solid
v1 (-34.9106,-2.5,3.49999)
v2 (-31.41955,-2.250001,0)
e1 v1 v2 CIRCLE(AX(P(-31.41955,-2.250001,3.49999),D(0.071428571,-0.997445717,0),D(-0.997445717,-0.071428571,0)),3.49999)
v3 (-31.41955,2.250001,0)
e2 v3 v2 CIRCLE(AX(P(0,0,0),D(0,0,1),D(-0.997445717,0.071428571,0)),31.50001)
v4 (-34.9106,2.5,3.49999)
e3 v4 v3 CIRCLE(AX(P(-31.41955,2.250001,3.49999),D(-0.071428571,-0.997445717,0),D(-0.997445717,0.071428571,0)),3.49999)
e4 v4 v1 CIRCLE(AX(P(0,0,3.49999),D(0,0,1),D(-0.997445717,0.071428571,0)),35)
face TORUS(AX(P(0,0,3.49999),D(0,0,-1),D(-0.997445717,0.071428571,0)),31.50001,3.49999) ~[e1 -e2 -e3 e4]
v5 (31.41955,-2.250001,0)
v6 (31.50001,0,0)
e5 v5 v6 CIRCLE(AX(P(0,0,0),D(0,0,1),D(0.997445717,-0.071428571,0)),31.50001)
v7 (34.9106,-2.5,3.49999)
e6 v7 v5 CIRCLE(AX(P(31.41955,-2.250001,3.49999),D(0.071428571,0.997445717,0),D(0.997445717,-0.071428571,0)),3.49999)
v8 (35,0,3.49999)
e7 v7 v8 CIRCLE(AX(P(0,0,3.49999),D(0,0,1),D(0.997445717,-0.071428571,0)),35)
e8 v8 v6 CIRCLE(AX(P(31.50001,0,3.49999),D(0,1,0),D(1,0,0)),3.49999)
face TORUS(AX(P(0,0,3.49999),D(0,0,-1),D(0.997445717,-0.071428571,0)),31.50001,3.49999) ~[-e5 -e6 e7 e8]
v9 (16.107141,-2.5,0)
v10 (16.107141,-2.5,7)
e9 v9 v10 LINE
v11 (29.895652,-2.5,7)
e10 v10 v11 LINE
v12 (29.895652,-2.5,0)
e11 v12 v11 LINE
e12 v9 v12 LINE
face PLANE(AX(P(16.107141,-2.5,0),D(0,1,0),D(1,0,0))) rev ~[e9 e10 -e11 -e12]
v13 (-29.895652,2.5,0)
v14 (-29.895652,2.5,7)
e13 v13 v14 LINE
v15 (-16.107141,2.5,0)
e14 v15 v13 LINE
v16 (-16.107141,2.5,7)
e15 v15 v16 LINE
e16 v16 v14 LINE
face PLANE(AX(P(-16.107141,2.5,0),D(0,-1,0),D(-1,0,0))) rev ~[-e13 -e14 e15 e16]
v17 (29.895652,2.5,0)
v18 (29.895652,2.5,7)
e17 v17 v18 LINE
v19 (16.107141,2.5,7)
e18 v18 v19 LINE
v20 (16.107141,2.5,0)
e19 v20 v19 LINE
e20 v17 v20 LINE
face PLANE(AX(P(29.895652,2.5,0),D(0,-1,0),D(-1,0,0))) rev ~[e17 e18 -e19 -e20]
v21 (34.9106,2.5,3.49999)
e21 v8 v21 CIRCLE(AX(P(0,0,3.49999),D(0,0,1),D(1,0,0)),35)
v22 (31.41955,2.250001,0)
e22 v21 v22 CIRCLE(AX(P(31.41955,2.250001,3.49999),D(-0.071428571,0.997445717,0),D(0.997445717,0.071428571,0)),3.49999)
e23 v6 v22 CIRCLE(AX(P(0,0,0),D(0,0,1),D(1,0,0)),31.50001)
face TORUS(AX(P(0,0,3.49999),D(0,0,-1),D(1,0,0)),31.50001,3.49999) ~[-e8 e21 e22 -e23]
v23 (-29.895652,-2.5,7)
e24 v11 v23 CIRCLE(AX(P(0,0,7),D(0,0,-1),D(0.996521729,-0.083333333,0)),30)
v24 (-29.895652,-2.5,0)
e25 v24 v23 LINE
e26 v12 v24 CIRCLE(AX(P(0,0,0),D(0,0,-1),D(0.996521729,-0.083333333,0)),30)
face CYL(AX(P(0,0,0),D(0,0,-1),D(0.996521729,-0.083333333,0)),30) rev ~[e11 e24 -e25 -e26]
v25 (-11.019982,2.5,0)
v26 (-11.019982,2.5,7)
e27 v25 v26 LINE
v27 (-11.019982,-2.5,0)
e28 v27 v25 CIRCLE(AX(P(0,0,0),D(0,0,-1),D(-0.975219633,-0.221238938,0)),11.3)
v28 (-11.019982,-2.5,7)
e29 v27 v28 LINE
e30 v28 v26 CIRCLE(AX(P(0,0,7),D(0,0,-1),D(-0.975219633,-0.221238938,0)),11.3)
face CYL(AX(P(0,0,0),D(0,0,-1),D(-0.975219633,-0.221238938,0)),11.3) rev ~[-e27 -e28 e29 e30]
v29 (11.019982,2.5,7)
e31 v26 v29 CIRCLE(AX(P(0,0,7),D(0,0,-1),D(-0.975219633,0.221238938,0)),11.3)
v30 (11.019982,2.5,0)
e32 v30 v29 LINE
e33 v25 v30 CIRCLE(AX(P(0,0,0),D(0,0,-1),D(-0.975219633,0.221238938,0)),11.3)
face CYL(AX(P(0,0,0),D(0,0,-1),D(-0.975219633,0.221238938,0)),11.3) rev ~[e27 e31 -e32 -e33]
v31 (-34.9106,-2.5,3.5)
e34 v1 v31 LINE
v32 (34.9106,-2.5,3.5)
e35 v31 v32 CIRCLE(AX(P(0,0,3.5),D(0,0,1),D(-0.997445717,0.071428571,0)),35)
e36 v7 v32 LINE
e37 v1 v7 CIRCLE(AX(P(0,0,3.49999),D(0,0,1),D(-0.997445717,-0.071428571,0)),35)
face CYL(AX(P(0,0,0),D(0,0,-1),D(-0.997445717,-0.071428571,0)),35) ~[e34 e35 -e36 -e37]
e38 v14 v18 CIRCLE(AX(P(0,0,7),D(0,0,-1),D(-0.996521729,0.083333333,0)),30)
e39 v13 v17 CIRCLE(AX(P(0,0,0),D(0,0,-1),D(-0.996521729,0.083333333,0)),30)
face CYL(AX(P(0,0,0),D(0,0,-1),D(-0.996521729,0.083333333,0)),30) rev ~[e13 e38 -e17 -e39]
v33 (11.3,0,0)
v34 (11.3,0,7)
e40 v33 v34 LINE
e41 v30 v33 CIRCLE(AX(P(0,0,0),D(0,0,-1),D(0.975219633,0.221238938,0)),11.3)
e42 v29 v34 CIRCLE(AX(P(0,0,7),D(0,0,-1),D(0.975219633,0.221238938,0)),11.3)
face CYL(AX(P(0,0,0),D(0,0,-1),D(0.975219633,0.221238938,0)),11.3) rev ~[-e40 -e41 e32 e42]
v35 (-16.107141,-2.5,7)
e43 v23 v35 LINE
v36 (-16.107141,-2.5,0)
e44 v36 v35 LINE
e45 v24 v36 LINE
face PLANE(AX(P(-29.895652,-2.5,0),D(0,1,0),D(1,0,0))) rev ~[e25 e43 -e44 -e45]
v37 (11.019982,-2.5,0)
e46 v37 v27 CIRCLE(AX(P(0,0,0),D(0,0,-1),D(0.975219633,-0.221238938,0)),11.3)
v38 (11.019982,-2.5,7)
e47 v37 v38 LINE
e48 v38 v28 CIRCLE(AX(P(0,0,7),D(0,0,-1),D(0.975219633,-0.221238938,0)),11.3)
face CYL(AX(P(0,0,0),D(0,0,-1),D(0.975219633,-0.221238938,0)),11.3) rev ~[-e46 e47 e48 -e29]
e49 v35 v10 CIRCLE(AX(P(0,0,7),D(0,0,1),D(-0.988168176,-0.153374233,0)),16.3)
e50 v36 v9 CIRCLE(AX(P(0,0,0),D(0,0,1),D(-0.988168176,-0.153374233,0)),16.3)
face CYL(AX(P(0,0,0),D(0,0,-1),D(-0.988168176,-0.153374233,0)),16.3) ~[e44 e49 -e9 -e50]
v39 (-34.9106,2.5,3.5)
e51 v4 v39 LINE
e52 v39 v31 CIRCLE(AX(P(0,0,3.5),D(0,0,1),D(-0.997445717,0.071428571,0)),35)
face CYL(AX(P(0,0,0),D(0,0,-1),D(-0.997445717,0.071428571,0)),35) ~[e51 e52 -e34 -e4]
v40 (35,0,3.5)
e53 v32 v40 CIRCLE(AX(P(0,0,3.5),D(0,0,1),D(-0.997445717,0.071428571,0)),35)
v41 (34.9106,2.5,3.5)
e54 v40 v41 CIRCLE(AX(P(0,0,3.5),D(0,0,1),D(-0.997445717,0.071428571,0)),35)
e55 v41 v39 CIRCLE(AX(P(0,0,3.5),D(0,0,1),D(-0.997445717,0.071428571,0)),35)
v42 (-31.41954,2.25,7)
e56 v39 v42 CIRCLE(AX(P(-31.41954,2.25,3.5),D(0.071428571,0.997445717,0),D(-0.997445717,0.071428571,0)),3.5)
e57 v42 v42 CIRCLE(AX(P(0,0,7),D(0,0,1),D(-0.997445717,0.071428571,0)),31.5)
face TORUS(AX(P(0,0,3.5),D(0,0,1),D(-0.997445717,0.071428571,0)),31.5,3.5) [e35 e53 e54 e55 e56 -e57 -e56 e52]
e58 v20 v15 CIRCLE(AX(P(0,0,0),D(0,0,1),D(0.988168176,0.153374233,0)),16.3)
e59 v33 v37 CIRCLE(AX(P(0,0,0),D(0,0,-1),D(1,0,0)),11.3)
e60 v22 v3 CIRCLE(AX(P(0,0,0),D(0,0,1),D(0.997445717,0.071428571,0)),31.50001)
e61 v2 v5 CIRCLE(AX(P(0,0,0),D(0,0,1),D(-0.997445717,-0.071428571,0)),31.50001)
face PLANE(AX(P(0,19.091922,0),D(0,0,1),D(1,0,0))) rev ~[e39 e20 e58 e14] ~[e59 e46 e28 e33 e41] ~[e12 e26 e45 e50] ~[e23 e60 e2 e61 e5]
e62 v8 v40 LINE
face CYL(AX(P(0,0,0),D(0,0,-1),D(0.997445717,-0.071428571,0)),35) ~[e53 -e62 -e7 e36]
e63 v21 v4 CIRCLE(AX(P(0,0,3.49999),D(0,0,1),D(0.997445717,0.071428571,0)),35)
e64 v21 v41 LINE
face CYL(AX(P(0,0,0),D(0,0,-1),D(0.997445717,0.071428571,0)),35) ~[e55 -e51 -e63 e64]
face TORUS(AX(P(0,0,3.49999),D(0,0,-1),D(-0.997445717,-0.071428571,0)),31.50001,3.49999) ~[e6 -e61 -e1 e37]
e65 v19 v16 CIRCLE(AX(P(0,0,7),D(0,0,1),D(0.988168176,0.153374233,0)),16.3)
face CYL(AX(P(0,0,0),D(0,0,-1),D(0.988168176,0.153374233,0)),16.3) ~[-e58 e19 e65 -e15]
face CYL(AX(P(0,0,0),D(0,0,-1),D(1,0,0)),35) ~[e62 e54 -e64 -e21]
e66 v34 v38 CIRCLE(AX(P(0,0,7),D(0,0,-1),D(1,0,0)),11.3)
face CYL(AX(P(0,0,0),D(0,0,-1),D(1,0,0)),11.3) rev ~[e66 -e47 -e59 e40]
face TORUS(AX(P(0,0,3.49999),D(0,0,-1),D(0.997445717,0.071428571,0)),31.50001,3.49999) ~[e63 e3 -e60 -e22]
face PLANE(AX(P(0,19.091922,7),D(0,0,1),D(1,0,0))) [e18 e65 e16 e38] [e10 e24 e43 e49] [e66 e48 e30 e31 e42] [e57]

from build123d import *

# Parameters (mm, degrees)
F1_DEPTH = 7
F3_R     = 3.49999


# Not quite as in the source:
# - a fillet or chamfer that OpenCascade refuses, or shapes differently, is made with other operations: its cross-section is extruded or revolved along the edge and cut away or added
# - a fillet or chamfer is up to 0.001 mm smaller than in the source, because OpenCascade refuses the exact size


with BuildPart() as f1:
    # F0 (on Top) → F1 (new body)
    with BuildSketch(Plane.XY):
        with BuildLine():
            ThreePointArc((-29.8956518578, 2.5), (0, 30), (29.8956518578, 2.5))
            Line((29.8956518578, 2.5), (34.9106001094, 2.5))
            ThreePointArc((34.9106001094, 2.5), (0, 35), (-34.9106001094, 2.5))
            Line((-34.9106001094, 2.5), (-29.8956518578, 2.5))
        make_face()
        with BuildLine():
            Line((34.9106001094, 2.5), (29.8956518578, 2.5))
            ThreePointArc((29.8956518578, 2.5), (29.9739016123, 1.2510883797), (30, 0))
            ThreePointArc((30, 0), (29.9739016123, -1.2510883797), (29.8956518578, -2.5))
            Line((29.8956518578, -2.5), (34.9106001094, -2.5))
            ThreePointArc((34.9106001094, -2.5), (34.9776428868, -1.2507989787), (35, 0))
            ThreePointArc((35, 0), (34.9776428868, 1.2507989787), (34.9106001094, 2.5))
        make_face()
        with BuildLine():
            Line((34.9106001094, -2.5), (29.8956518578, -2.5))
            ThreePointArc((29.8956518578, -2.5), (0, -30), (-29.8956518578, -2.5))
            Line((-29.8956518578, -2.5), (-34.9106001094, -2.5))
            ThreePointArc((-34.9106001094, -2.5), (0, -35), (34.9106001094, -2.5))
        make_face()
        with BuildLine():
            ThreePointArc((-29.8956518578, -2.5), (-30, 0), (-29.8956518578, 2.5))
            Line((-29.8956518578, 2.5), (-34.9106001094, 2.5))
            ThreePointArc((-34.9106001094, 2.5), (-35, 0), (-34.9106001094, -2.5))
            Line((-34.9106001094, -2.5), (-29.8956518578, -2.5))
        make_face()
        with BuildLine():
            ThreePointArc((-16.1071412734, -2.5), (-16.3, 0), (-16.1071412734, 2.5))
            Line((-16.1071412734, 2.5), (-29.8956518578, 2.5))
            ThreePointArc((-29.8956518578, 2.5), (-30, 0), (-29.8956518578, -2.5))
            Line((-29.8956518578, -2.5), (-16.1071412734, -2.5))
        make_face()
        with BuildLine():
            ThreePointArc((-11.0199818512, -2.5), (-11.3, 0), (-11.0199818512, 2.5))
            Line((-11.0199818512, 2.5), (-16.1071412734, 2.5))
            ThreePointArc((-16.1071412734, 2.5), (-16.3, 0), (-16.1071412734, -2.5))
            Line((-16.1071412734, -2.5), (-11.0199818512, -2.5))
        make_face()
        with BuildLine():
            ThreePointArc((-11.0199818512, 2.5), (0, 11.3), (11.0199818512, 2.5))
            Line((11.0199818512, 2.5), (16.1071412734, 2.5))
            ThreePointArc((16.1071412734, 2.5), (0, 16.3), (-16.1071412734, 2.5))
            Line((-16.1071412734, 2.5), (-11.0199818512, 2.5))
        make_face()
        with BuildLine():
            Line((16.1071412734, -2.5), (11.0199818512, -2.5))
            ThreePointArc((11.0199818512, -2.5), (0, -11.3), (-11.0199818512, -2.5))
            Line((-11.0199818512, -2.5), (-16.1071412734, -2.5))
            ThreePointArc((-16.1071412734, -2.5), (0, -16.3), (16.1071412734, -2.5))
        make_face()
        with BuildLine():
            Line((29.8956518578, 2.5), (16.1071412734, 2.5))
            ThreePointArc((16.1071412734, 2.5), (16.2517137982, 1.2537139315), (16.3, 0))
            ThreePointArc((16.3, 0), (16.2517137982, -1.2537139315), (16.1071412734, -2.5))
            Line((16.1071412734, -2.5), (29.8956518578, -2.5))
            ThreePointArc((29.8956518578, -2.5), (29.9739016123, -1.2510883797), (30, 0))
            ThreePointArc((30, 0), (29.9739016123, 1.2510883797), (29.8956518578, 2.5))
        make_face()
        with BuildLine():
            ThreePointArc((11.0199818512, 2.5), (11.2297772667, 1.2578165768), (11.3, 0))
            ThreePointArc((11.3, 0), (11.2297772667, -1.2578165768), (11.0199818512, -2.5))
            Line((11.0199818512, -2.5), (16.1071412734, -2.5))
            ThreePointArc((16.1071412734, -2.5), (16.2517137982, -1.2537139315), (16.3, 0))
            ThreePointArc((16.3, 0), (16.2517137982, 1.2537139315), (16.1071412734, 2.5))
            Line((16.1071412734, 2.5), (11.0199818512, 2.5))
        make_face()
    extrude(amount=F1_DEPTH)

    # F2: fillet of radius 3.5 on 1 edges, made by hand

    # F2_s1 → F2_t2 (revolve, cut)
    with BuildSketch(Plane(origin=(0, 0, 0), x_dir=(0, 0, 1), z_dir=(0.0714285714, 0.9974457174, 0))):
        with BuildLine():
            ThreePointArc((3.5, -35), (5.9748737342, -33.9748737342), (7, -31.5))
            Line((7, -31.5), (7, -35))
            Line((7, -35), (3.5, -35))
        make_face()
    revolve(axis=Axis((0, 0, 7), (0, 0, 1)), mode=Mode.SUBTRACT)

    # F3 (radius 3.5 in the source; OpenCascade refuses exactly that, so slightly less here)
    f3_edges = [f1.edges().sort_by_distance(p)[0] for p in [
        (34.9106, -2.5, 0),
    ]]
    fillet(f3_edges, radius=F3_R)


solid = f1.part
